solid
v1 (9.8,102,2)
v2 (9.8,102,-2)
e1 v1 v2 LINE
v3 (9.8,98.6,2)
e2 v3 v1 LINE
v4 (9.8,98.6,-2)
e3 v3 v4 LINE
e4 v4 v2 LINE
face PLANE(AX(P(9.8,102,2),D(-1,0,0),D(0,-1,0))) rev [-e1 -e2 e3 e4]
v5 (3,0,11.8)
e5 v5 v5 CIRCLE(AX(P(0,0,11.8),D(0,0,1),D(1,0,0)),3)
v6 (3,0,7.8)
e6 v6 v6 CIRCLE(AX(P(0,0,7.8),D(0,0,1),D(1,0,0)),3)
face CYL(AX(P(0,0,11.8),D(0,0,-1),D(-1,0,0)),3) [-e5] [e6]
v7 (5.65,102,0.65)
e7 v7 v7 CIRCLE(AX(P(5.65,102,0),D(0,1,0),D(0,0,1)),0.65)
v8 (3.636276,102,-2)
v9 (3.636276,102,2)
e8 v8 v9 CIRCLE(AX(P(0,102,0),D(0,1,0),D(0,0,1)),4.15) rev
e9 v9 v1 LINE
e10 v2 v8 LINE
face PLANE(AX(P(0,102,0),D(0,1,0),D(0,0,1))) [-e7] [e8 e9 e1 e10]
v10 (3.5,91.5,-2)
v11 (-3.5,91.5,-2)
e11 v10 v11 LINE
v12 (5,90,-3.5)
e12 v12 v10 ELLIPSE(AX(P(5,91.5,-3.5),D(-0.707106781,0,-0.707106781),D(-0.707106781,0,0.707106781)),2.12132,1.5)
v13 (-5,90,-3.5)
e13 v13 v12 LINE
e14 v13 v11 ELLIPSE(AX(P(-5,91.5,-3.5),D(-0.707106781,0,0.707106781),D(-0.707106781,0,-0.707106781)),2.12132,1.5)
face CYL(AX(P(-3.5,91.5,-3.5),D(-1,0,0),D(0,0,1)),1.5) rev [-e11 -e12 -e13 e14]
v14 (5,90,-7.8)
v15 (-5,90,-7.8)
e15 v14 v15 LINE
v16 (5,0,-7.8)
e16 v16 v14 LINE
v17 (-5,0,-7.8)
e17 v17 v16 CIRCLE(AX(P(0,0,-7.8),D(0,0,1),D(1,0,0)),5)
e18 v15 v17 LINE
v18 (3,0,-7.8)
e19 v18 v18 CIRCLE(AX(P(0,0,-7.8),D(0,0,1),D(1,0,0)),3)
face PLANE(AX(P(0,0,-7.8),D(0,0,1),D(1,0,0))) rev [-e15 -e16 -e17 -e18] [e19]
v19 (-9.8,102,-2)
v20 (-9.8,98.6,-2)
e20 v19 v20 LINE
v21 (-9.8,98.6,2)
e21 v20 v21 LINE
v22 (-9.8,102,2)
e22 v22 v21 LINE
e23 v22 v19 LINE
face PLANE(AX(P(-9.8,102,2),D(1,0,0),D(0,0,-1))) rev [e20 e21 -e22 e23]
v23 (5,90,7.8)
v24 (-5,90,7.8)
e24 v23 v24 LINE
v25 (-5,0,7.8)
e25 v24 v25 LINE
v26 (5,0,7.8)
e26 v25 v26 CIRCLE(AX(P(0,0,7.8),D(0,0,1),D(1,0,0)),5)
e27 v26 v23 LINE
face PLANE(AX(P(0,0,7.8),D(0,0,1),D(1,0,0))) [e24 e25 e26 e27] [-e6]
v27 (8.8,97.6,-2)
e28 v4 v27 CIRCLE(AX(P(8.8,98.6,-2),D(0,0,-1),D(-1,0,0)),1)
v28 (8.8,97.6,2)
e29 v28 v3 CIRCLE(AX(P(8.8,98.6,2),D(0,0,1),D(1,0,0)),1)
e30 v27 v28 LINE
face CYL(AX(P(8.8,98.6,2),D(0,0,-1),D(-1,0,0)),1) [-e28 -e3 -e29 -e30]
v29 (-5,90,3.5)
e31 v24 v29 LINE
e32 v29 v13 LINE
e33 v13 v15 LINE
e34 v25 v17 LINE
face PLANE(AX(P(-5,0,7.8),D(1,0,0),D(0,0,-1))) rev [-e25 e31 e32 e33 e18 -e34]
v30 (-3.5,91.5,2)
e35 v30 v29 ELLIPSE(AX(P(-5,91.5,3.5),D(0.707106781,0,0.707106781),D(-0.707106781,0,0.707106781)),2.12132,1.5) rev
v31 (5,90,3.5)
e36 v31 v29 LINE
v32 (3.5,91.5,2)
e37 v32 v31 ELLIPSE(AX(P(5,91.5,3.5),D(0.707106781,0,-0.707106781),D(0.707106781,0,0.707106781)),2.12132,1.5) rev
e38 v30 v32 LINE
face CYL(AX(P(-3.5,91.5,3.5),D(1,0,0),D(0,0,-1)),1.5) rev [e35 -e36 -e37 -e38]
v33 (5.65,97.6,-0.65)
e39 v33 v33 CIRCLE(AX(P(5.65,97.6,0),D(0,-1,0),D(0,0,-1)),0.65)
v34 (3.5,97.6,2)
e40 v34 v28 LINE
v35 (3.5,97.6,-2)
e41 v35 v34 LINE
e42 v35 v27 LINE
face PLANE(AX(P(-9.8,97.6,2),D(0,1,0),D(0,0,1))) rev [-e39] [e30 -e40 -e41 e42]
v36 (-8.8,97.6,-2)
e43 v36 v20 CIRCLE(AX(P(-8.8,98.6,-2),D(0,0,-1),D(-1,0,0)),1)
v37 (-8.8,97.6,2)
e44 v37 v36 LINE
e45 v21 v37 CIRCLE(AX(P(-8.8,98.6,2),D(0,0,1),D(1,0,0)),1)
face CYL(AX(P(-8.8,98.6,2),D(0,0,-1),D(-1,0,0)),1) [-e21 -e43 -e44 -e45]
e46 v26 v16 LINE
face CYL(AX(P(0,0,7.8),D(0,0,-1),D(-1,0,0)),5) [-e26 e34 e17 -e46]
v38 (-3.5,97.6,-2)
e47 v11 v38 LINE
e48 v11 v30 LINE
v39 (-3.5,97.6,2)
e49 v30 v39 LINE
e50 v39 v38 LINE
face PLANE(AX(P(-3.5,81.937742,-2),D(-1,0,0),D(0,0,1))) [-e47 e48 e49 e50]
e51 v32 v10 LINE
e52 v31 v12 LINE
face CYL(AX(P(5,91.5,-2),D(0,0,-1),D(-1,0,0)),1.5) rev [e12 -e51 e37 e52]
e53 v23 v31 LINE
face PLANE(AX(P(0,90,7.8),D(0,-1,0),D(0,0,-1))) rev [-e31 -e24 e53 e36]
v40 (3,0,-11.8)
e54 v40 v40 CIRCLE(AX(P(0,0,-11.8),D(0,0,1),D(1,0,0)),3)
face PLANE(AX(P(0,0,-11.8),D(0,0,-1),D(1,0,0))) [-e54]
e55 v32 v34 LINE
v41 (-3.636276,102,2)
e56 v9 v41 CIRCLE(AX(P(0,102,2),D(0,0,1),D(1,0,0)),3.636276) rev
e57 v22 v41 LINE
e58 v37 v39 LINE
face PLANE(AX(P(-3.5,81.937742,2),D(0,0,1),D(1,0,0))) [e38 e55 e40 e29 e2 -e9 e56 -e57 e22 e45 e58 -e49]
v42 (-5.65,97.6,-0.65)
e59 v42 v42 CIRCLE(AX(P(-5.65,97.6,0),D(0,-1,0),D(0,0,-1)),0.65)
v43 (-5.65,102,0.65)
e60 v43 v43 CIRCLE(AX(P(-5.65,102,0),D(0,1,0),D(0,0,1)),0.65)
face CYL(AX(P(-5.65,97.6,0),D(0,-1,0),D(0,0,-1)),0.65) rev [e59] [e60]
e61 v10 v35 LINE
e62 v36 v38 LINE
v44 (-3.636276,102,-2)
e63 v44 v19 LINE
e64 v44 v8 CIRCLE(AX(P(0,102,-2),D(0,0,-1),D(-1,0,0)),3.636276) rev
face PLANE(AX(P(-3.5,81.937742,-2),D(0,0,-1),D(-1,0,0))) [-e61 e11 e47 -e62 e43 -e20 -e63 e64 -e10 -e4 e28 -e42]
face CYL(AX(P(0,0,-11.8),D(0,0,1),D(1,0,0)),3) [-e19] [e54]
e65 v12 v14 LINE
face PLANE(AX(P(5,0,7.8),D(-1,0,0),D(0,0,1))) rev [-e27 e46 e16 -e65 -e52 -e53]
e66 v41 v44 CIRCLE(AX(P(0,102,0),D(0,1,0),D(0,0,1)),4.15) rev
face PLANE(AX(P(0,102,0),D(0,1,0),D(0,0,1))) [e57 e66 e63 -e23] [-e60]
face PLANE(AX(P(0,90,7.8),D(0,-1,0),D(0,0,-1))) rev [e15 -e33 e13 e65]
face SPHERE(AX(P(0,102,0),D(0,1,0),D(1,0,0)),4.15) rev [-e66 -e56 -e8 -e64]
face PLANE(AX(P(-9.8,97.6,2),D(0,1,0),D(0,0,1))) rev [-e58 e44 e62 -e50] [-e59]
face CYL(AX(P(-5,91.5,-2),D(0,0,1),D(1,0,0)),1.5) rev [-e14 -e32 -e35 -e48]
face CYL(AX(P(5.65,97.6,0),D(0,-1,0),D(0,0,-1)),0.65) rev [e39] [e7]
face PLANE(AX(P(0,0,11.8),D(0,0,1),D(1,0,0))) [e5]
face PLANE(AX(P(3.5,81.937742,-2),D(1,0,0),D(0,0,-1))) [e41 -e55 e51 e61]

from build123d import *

# Parameters (mm, degrees)
EXTRUDE_1_DEPTH = 7.8
SKETCH_4_R      = 3
EXTRUDE_3_DEPTH = 4
SKETCH_5_W      = 7
SKETCH_5_H      = 4
EXTRUDE_4_DEPTH = 12
SKETCH_7_W      = 19.6
SKETCH_7_H      = 4.4
EXTRUDE_5_DEPTH = 2
FILLET_2_R      = 1
HOLE_WIZARD_1_D = 1.3
FILLET_3_R      = 1.5


with BuildPart() as part:
    # 草图1 → 凸台-拉伸1 (new, symmetric)
    with BuildSketch(Plane.XY):
        with BuildLine():
            Line((5, 0), (5, 90))
            Line((5, 90), (-5, 90))
            Line((-5, 90), (-5, 0))
            ThreePointArc((-5, 0), (0, -5), (5, 0))
        make_face()
    extrude(amount=EXTRUDE_1_DEPTH, both=True)

    # 草图4 → 凸台-拉伸3 (add)
    with BuildSketch(Plane.XY.offset(7.8)):
        Circle(SKETCH_4_R)
    extrude_3 = extrude(amount=EXTRUDE_3_DEPTH)

    # 草图5 → 凸台-拉伸4 (add)
    with BuildSketch(Plane(origin=(0, 102, 0), x_dir=(1, 0, 0), z_dir=(0, 1, 0))):
        Rectangle(SKETCH_5_W, SKETCH_5_H)
    extrude(amount=-EXTRUDE_4_DEPTH)

    # 草图7 → 凸台-拉伸5 (add, symmetric)
    with BuildSketch(Plane.XY):
        with Locations((0, 99.8)):
            Rectangle(SKETCH_7_W, SKETCH_7_H)
    extrude(amount=EXTRUDE_5_DEPTH, both=True)

    # 草图10 → 切除-旋转1 (revolve, cut)
    with BuildSketch(Plane.XY):
        with BuildLine():
            ThreePointArc((4.15, 102), (2.934493142, 104.934493142), (0, 106.15))
            Line((0, 106.15), (0, 102))
            Line((0, 102), (0, 97.85))
            ThreePointArc((0, 97.85), (2.934493142, 99.065506858), (4.15, 102))
        make_face()
    revolve(axis=Axis((0, 106.15, 0), (0, -1, 0)), mode=Mode.SUBTRACT)

    # 镜向2: 凸台-拉伸3 across plane
    add(extrude_3.mirror(Plane.XY))

    # 圆角2
    fillet_2_edges = [part.edges().sort_by_distance(p)[0] for p in [
        (-9.8, 97.6, 0),
        (9.8, 97.6, 0),
    ]]
    fillet(fillet_2_edges, radius=FILLET_2_R)

    # 孔1 (through all)
    with Locations(Plane(origin=(0, 97.6, 0), x_dir=(-1, 0, 0), z_dir=(0, -1, 0))):
        with Locations((5.65, 0), (-5.65, 0)):
            Hole(HOLE_WIZARD_1_D / 2)

    # 圆角3
    fillet_3_edges = [part.edges().sort_by_distance(p)[0] for p in [
        (0, 90, -2),
        (-3.5, 90, 0),
        (0, 90, 2),
        (3.5, 90, 0),
    ]]
    fillet(fillet_3_edges, radius=FILLET_3_R - 0.0001)  # a hair under: the kernel refuses the full size


solid = part.part
